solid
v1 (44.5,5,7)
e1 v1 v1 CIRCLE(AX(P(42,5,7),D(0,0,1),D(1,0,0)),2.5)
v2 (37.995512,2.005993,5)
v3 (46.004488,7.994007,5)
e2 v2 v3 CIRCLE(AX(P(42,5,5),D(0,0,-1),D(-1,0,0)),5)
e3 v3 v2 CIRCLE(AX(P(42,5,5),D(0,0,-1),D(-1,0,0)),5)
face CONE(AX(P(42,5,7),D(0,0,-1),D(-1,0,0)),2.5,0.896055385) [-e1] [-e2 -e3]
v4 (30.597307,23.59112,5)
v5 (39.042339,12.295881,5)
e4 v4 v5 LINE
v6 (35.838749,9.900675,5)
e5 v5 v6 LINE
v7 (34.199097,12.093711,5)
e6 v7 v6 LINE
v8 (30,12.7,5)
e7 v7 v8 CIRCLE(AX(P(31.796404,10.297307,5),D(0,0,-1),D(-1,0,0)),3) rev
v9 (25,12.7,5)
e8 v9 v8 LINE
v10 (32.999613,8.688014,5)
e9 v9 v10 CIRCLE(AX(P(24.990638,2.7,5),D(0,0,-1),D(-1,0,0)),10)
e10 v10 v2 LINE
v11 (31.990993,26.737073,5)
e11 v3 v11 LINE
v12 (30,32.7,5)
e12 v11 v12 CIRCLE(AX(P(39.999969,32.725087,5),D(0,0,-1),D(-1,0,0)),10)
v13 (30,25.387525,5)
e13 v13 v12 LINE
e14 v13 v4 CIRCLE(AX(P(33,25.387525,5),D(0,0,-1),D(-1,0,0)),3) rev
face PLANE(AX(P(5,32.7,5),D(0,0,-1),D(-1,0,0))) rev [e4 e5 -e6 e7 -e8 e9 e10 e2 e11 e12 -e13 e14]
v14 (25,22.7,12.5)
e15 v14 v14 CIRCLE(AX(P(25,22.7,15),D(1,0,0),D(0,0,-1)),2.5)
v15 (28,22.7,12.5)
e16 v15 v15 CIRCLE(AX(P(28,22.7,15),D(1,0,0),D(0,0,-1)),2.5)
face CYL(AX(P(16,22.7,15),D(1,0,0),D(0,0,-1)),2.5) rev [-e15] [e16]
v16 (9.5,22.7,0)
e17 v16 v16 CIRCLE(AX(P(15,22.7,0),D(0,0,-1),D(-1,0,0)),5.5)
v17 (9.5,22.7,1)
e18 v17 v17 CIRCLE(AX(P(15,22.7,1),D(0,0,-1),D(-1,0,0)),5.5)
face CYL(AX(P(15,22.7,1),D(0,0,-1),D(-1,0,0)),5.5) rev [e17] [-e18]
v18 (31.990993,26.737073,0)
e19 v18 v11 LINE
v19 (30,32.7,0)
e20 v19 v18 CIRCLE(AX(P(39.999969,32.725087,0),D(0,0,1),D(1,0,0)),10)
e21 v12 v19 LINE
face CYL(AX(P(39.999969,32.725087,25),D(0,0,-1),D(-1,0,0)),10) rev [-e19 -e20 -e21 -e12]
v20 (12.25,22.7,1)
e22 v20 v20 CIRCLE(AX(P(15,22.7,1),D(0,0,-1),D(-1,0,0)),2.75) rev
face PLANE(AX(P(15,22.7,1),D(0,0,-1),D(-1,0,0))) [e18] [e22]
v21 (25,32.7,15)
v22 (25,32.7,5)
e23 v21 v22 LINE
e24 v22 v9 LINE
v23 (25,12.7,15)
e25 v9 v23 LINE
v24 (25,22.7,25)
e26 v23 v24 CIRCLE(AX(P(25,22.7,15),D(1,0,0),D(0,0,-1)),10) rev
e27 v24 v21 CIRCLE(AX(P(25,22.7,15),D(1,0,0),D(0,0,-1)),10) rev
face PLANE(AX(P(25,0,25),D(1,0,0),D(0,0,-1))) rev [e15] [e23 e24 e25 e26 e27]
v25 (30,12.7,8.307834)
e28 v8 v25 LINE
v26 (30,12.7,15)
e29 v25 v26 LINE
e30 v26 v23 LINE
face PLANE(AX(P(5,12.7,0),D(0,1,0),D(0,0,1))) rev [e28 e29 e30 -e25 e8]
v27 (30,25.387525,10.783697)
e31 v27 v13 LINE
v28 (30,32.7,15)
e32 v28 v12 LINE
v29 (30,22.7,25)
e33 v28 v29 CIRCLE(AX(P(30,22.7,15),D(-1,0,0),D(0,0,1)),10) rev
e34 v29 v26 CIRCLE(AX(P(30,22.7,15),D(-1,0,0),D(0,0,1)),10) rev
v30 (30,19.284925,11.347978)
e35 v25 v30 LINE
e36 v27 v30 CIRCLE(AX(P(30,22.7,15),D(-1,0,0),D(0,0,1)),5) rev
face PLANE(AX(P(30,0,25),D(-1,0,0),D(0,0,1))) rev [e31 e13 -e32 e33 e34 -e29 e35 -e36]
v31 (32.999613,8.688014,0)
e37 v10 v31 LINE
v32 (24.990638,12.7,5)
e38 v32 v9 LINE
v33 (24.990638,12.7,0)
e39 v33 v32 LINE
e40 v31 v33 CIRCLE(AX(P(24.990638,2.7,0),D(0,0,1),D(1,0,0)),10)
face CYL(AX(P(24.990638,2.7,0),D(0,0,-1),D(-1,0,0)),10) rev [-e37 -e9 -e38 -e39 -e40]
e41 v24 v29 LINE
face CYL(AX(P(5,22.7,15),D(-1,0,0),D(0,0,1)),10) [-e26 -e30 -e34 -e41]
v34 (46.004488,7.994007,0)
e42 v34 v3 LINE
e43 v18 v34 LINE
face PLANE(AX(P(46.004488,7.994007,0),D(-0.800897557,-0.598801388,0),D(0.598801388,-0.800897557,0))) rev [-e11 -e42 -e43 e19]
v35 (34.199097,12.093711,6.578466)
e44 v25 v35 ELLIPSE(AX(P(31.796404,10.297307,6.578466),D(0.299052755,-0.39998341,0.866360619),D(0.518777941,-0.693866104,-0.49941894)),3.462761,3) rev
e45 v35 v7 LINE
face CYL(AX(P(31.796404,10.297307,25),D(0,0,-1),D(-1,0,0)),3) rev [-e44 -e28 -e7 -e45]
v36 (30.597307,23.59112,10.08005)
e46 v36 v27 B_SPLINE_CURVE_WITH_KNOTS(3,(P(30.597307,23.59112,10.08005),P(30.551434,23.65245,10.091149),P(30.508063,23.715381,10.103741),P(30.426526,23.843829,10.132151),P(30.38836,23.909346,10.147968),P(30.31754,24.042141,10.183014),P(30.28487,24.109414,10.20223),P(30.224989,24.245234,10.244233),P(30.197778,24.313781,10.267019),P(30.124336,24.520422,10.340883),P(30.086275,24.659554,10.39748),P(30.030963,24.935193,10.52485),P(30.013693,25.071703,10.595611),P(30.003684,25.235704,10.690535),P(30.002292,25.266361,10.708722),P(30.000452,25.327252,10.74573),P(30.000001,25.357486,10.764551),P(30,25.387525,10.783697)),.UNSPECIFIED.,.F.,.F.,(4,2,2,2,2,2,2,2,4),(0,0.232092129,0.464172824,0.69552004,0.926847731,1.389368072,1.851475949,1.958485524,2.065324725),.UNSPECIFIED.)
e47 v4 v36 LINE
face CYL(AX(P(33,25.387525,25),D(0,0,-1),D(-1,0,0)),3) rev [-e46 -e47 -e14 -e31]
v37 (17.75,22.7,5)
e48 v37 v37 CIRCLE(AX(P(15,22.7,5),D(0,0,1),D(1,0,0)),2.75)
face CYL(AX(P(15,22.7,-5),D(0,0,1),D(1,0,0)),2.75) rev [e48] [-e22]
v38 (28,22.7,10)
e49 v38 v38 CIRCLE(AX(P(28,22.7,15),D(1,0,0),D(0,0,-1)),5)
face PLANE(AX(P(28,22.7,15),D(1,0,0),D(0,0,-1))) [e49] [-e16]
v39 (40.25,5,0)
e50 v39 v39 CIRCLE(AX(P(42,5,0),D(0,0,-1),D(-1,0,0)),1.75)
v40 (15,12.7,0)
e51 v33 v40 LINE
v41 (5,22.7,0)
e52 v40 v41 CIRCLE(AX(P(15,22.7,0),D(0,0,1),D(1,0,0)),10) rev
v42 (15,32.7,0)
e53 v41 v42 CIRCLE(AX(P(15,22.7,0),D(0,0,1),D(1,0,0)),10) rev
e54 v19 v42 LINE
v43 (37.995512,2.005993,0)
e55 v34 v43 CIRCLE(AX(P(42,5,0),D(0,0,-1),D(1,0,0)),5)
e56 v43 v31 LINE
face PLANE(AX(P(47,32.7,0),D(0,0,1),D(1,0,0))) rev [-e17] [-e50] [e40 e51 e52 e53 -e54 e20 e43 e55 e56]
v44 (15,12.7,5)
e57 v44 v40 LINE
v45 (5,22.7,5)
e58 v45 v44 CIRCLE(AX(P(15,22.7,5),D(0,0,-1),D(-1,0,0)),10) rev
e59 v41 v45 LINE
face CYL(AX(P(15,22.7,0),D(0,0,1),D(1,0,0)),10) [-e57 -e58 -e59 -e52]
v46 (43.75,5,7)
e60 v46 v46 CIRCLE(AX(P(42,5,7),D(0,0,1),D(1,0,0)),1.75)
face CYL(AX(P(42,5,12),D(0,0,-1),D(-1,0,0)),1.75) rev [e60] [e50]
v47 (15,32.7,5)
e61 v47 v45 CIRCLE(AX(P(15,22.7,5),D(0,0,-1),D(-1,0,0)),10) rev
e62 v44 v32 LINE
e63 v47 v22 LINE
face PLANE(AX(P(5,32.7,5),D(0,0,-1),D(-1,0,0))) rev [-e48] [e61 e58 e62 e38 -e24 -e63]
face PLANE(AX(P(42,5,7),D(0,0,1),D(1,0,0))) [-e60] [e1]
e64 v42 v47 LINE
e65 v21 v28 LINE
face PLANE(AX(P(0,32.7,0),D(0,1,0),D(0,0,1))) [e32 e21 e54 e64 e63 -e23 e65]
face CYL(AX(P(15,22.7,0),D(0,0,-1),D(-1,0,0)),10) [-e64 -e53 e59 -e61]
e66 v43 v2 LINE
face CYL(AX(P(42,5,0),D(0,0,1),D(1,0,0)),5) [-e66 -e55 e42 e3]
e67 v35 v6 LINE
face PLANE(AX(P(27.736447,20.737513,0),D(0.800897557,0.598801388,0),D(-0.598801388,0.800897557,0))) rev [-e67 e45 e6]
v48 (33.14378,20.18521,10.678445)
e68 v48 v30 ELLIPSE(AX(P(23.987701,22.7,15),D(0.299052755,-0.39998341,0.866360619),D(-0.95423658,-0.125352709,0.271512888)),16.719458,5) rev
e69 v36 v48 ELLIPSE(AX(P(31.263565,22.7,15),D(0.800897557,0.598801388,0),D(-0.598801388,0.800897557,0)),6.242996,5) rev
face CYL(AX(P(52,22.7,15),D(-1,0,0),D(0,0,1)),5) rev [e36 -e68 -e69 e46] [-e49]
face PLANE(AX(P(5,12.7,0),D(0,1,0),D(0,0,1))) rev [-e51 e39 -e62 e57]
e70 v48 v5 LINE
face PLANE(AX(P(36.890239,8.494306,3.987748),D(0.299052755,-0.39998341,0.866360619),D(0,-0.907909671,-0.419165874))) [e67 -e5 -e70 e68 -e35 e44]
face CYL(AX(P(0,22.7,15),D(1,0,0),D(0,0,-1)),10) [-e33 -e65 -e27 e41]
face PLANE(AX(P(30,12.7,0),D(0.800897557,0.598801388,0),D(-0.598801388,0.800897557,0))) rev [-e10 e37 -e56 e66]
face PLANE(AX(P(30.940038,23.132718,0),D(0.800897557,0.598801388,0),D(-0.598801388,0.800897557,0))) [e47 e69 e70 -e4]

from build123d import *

# Parameters (mm, degrees)
BOSS_EXTRUDE1_DEPTH      = 32.7
SKETCH2_R                = 2.75
CUT_EXTRUDE1_DEPTH       = 10
SKETCH3_R                = 2.75
CUT_EXTRUDE2_DEPTH       = 10
SKETCH4_R                = 5.5
CUT_EXTRUDE3_DEPTH       = 1
SKETCH5_R                = 5.5
CUT_EXTRUDE4_DEPTH       = 1
SKETCH6_R                = 1.75
CUT_EXTRUDE5_DEPTH       = 12
SKETCH7_R                = 2.5
SKETCH7_R_2              = 1.75
BOSS_EXTRUDE2_DEPTH      = 2
CHAMFER2_SIZE2           = 2
CHAMFER2_SIZE            = 2.5
SKETCH9_W                = 5
SKETCH9_H                = 32.7
BOSS_EXTRUDE3_DEPTH      = 20
CUT_EXTRUDE7_DEPTH       = 61.648907657
CUT_EXTRUDE7_DEPTH_BACK  = 61.648907657
BOSS_EXTRUDE4_DEPTH      = 2
BOSS_EXTRUDE4_DEPTH_BACK = 2
CUT_EXTRUDE8_DEPTH       = 22
CUT_EXTRUDE8_DEPTH_BACK  = 2
SKETCH12_R               = 5
SKETCH13_R               = 2.5
CUT_EXTRUDE9_DEPTH       = 12
FILLET2_R                = 10
FILLET3_R                = 3


# Some blends are built 0.0001 mm under size
with BuildPart() as part:
    # Sketch1 → Boss-Extrude1 (new body)
    with BuildSketch(Plane(origin=(0, 0, 0), x_dir=(1, 0, 0), z_dir=(0, 1, 0))):
        Polygon((0, 0), (0, -25), (5, -25), (5, -5), (47, -5), (47, 0), align=None)
    extrude(amount=BOSS_EXTRUDE1_DEPTH)

    # Sketch2 → Cut-Extrude1 (cut)
    with BuildSketch(Plane(origin=(5, 0, 0), x_dir=(0, 0, -1), z_dir=(1, 0, 0))):
        with Locations((-15, 22.7)):
            Circle(SKETCH2_R)
    extrude(amount=-CUT_EXTRUDE1_DEPTH, mode=Mode.SUBTRACT)

    # Sketch3 → Cut-Extrude2 (cut)
    with BuildSketch(Plane.XY.offset(5)):
        with Locations((15, 22.7)):
            Circle(SKETCH3_R)
    extrude(amount=-CUT_EXTRUDE2_DEPTH, mode=Mode.SUBTRACT)

    # Sketch4 → Cut-Extrude3 (cut)
    with BuildSketch(Plane(origin=(0, 0, 0), x_dir=(0, 0, -1), z_dir=(1, 0, 0))):
        with Locations((-15, 22.7)):
            Circle(SKETCH4_R)
    extrude(amount=CUT_EXTRUDE3_DEPTH, mode=Mode.SUBTRACT)

    # Sketch5 → Cut-Extrude4 (cut)
    with BuildSketch(Plane(origin=(0, 0, 0), x_dir=(-1, 0, 0), z_dir=(0, 0, -1))):
        with Locations((-15, 22.7)):
            Circle(SKETCH5_R)
    extrude(amount=-CUT_EXTRUDE4_DEPTH, mode=Mode.SUBTRACT)

    # Sketch6 → Cut-Extrude5 (cut)
    with BuildSketch(Plane(origin=(0, 0, 0), x_dir=(-1, 0, 0), z_dir=(0, 0, -1))):
        with Locations((-42, 5)):
            Circle(SKETCH6_R)
    extrude(amount=-CUT_EXTRUDE5_DEPTH, mode=Mode.SUBTRACT)

    # Sketch7 → Boss-Extrude2 (add)
    with BuildSketch(Plane.XY.offset(5)):
        with Locations(Location((42, 5, 0), (0, 0, 180))):
            Circle(SKETCH7_R)
        with Locations(Location((42, 5, 0), (0, 0, 180))):
            Circle(SKETCH7_R_2, mode=Mode.SUBTRACT)
    extrude(amount=BOSS_EXTRUDE2_DEPTH)

    # Chamfer2
    chamfer2_edges = [part.edges().sort_by_distance(p)[0] for p in [
        (44.5, 5, 5),
    ]]
    chamfer2_side = [part.faces().sort_by_distance(p)[0] for p in [
        (44.54, 5, 5),
    ]]
    chamfer(chamfer2_edges, length=CHAMFER2_SIZE - 0.0001, length2=CHAMFER2_SIZE2 - 0.0001, reference=chamfer2_side[0])  # a hair under: the kernel refuses the full size

    # Sketch9 → Boss-Extrude3 (add)
    with BuildSketch(Plane.XY.offset(5)):
        with Locations((27.5, 16.35)):
            Rectangle(SKETCH9_W, SKETCH9_H)
    extrude(amount=BOSS_EXTRUDE3_DEPTH)

    # Sketch10 → Cut-Extrude7 (cut, two sides: drawn at the far end of the back side and taken through both)
    with BuildSketch(Plane.XY.offset(5).offset(-CUT_EXTRUDE7_DEPTH_BACK)):
        with BuildLine():
            Line((5, 12.7), (30, 12.7))
            Line((30, 12.7), (37.995512213, 2.005993059))
            ThreePointArc((37.995512213, 2.005993059), (44.994006941, 0.995512213), (46.004487787, 7.994006941))
            Line((46.004487787, 7.994006941), (30, 29.400028085))
            Line((30, 29.400028085), (30, 32.7))
            Line((30, 32.7), (49.686472609, 32.7))
            Line((49.686472609, 32.7), (49.686472609, -0.881235219))
            Line((49.686472609, -0.881235219), (0, -0.881235219))
            Line((0, -0.881235219), (0, 12.7))
            Line((0, 12.7), (0, 32.7))
            Line((0, 32.7), (5, 32.7))
            Line((5, 32.7), (5, 12.7))
        make_face()
    extrude(amount=CUT_EXTRUDE7_DEPTH + CUT_EXTRUDE7_DEPTH_BACK, mode=Mode.SUBTRACT)

    # Sketch11 → Boss-Extrude4 (add, two sides: drawn at the far end of the back side and taken through both)
    with BuildSketch(Plane(origin=(29.338242541, 21.935115419, 0), x_dir=(0, 0, -1), z_dir=(0.8008975574269149, 0.5988013881977909, 0)).offset(-BOSS_EXTRUDE4_DEPTH_BACK)):
        Polygon((-3.987748306, -15.286856853), (-15.005027819, 3.825227861), (-3.987748306, 3.825227861), align=None)
    extrude(amount=BOSS_EXTRUDE4_DEPTH + BOSS_EXTRUDE4_DEPTH_BACK)

    # Sketch12 → Cut-Extrude8 (cut, two sides: drawn at the far end of the back side and taken through both)
    with BuildSketch(Plane(origin=(30, 0, 0), x_dir=(0, 0, -1), z_dir=(1, 0, 0)).offset(-CUT_EXTRUDE8_DEPTH_BACK)):
        with Locations(Location((-15, 22.7, 0), (0, 0, 316.92030417))):
            Circle(SKETCH12_R)
    extrude(amount=CUT_EXTRUDE8_DEPTH + CUT_EXTRUDE8_DEPTH_BACK, mode=Mode.SUBTRACT)

    # Sketch13 → Cut-Extrude9 (cut)
    with BuildSketch(Plane(origin=(28, 0, 0), x_dir=(0, 0, -1), z_dir=(1, 0, 0))):
        with Locations((-15, 22.7)):
            Circle(SKETCH13_R)
    extrude(amount=-CUT_EXTRUDE9_DEPTH, mode=Mode.SUBTRACT)

    # Fillet2
    # the kernel refuses this fillet: 10 mm, written as the material it adds along each edge
    with BuildSketch(Plane(origin=(30, 12.7, 5), x_dir=(-1, 0, 0), z_dir=(0, 0, -1))) as fillet2_piece_1:
        with BuildLine():
            CenterArc((FILLET2_R * 0.500936240948, -FILLET2_R), FILLET2_R, 90, 53.215898456)
            Line((-FILLET2_R * 0.299961316478, -FILLET2_R * 0.401198611802), (0, 0))
            Line((0, 0), (FILLET2_R * 0.500936240948, 0))
        make_face()
    extrude(amount=5)
    with BuildSketch(Plane(origin=(30, 29.400028085, 5), x_dir=(0, 1, 0), z_dir=(0, 0, -1))) as fillet2_piece_2_section:
        with BuildLine():
            CenterArc((FILLET2_R * 0.332501638268, FILLET2_R), FILLET2_R, 233.215898456, 36.784101544)
            Line((-FILLET2_R * 0.26629974993, FILLET2_R * 0.199102442573), (0, 0))
            Line((0, 0), (FILLET2_R * 0.332501638268, 0))
        make_face()
    fillet2_piece_2 = extrude(amount=5, mode=Mode.PRIVATE)
    fillet2_piece_2 = split(fillet2_piece_2, bisect_by=Plane(origin=(30.405353405, 32.7, 2.5), z_dir=(0, -1, 0)), keep=Keep.TOP, mode=Mode.PRIVATE)
    add(fillet2_piece_2)
    # the kernel refuses this fillet: 10 mm, written as the material it takes off along each edge
    with BuildSketch(Plane(origin=(5, 32.7, -25), x_dir=(1, 0, 0), z_dir=(0, 0, 1)), Plane(origin=(5, 12.7, -25), x_dir=(0, 1, 0), z_dir=(0, 0, 1)), Plane(origin=(55, 32.7, 25), x_dir=(0, -1, 0), z_dir=(-1, 0, 0))) as fillet2_2_piece_1:
        with BuildLine():
            CenterArc((FILLET2_R, -FILLET2_R), FILLET2_R, 90, 90)
            Line((0, -FILLET2_R), (0, 0))
            Line((0, 0), (FILLET2_R, 0))
        make_face()
    extrude(amount=55, mode=Mode.SUBTRACT)
    with BuildSketch(Plane(origin=(55, 12.7, 25), x_dir=(0, 1, 0), z_dir=(-1, 0, 0))) as fillet2_2_piece_2:
        with BuildLine():
            CenterArc((FILLET2_R, FILLET2_R), FILLET2_R, 180, 90)
            Line((0, FILLET2_R), (0, 0))
            Line((0, 0), (FILLET2_R, 0))
        make_face()
    extrude(amount=55, mode=Mode.SUBTRACT)

    # Fillet3
    # the kernel refuses this fillet: 3 mm, written as the material it adds along each edge
    with BuildSketch(Plane(origin=(30, 17.710008425, 5), x_dir=(0, -1, 0), z_dir=(0, 0, 1))) as fillet3_piece_1_section:
        with BuildLine():
            CenterArc((7.412701098, 1.796404165), FILLET3_R, 126.784101544, 90)
            Line((5.616296933, 4.199096837), (0, 0))
            Line((0, 0), (5.010008425, 0))
        make_face()
    fillet3_piece_1 = extrude(amount=23.152125711, mode=Mode.PRIVATE)
    fillet3_piece_1 = split(fillet3_piece_1, bisect_by=Plane(origin=(32.136421782, 12.848533367, 7.638953708), z_dir=(-0.29905275482083415, 0.39998340952189465, -0.8663606188772148)), keep=Keep.TOP, mode=Mode.PRIVATE)
    add(fillet3_piece_1)
    with BuildSketch(Plane(origin=(30, 24.390019659, 2.506237713), x_dir=(0, 1, 0), z_dir=(0, 0, 1))) as fillet3_piece_2_section:
        with BuildLine():
            CenterArc((FILLET3_R * 0.332501638268, -FILLET3_R), FILLET3_R, 90, 36.784101544)
            Line((-FILLET3_R * 0.26629974993, -FILLET3_R * 0.199102442573), (0, 0))
            Line((0, 0), (FILLET3_R * 0.332501638268, 0))
        make_face()
    fillet3_piece_2 = extrude(amount=10.281801085, mode=Mode.PRIVATE)
    fillet3_piece_2 = fillet3_piece_2 - Plane(origin=(30.119829387, 22.7, 15), x_dir=(0, -0.6830149798048508, -0.7304043656510956), z_dir=(1, 0, 0)) * Cylinder(5, 25, mode=Mode.PRIVATE)
    add(fillet3_piece_2)


solid = part.part
